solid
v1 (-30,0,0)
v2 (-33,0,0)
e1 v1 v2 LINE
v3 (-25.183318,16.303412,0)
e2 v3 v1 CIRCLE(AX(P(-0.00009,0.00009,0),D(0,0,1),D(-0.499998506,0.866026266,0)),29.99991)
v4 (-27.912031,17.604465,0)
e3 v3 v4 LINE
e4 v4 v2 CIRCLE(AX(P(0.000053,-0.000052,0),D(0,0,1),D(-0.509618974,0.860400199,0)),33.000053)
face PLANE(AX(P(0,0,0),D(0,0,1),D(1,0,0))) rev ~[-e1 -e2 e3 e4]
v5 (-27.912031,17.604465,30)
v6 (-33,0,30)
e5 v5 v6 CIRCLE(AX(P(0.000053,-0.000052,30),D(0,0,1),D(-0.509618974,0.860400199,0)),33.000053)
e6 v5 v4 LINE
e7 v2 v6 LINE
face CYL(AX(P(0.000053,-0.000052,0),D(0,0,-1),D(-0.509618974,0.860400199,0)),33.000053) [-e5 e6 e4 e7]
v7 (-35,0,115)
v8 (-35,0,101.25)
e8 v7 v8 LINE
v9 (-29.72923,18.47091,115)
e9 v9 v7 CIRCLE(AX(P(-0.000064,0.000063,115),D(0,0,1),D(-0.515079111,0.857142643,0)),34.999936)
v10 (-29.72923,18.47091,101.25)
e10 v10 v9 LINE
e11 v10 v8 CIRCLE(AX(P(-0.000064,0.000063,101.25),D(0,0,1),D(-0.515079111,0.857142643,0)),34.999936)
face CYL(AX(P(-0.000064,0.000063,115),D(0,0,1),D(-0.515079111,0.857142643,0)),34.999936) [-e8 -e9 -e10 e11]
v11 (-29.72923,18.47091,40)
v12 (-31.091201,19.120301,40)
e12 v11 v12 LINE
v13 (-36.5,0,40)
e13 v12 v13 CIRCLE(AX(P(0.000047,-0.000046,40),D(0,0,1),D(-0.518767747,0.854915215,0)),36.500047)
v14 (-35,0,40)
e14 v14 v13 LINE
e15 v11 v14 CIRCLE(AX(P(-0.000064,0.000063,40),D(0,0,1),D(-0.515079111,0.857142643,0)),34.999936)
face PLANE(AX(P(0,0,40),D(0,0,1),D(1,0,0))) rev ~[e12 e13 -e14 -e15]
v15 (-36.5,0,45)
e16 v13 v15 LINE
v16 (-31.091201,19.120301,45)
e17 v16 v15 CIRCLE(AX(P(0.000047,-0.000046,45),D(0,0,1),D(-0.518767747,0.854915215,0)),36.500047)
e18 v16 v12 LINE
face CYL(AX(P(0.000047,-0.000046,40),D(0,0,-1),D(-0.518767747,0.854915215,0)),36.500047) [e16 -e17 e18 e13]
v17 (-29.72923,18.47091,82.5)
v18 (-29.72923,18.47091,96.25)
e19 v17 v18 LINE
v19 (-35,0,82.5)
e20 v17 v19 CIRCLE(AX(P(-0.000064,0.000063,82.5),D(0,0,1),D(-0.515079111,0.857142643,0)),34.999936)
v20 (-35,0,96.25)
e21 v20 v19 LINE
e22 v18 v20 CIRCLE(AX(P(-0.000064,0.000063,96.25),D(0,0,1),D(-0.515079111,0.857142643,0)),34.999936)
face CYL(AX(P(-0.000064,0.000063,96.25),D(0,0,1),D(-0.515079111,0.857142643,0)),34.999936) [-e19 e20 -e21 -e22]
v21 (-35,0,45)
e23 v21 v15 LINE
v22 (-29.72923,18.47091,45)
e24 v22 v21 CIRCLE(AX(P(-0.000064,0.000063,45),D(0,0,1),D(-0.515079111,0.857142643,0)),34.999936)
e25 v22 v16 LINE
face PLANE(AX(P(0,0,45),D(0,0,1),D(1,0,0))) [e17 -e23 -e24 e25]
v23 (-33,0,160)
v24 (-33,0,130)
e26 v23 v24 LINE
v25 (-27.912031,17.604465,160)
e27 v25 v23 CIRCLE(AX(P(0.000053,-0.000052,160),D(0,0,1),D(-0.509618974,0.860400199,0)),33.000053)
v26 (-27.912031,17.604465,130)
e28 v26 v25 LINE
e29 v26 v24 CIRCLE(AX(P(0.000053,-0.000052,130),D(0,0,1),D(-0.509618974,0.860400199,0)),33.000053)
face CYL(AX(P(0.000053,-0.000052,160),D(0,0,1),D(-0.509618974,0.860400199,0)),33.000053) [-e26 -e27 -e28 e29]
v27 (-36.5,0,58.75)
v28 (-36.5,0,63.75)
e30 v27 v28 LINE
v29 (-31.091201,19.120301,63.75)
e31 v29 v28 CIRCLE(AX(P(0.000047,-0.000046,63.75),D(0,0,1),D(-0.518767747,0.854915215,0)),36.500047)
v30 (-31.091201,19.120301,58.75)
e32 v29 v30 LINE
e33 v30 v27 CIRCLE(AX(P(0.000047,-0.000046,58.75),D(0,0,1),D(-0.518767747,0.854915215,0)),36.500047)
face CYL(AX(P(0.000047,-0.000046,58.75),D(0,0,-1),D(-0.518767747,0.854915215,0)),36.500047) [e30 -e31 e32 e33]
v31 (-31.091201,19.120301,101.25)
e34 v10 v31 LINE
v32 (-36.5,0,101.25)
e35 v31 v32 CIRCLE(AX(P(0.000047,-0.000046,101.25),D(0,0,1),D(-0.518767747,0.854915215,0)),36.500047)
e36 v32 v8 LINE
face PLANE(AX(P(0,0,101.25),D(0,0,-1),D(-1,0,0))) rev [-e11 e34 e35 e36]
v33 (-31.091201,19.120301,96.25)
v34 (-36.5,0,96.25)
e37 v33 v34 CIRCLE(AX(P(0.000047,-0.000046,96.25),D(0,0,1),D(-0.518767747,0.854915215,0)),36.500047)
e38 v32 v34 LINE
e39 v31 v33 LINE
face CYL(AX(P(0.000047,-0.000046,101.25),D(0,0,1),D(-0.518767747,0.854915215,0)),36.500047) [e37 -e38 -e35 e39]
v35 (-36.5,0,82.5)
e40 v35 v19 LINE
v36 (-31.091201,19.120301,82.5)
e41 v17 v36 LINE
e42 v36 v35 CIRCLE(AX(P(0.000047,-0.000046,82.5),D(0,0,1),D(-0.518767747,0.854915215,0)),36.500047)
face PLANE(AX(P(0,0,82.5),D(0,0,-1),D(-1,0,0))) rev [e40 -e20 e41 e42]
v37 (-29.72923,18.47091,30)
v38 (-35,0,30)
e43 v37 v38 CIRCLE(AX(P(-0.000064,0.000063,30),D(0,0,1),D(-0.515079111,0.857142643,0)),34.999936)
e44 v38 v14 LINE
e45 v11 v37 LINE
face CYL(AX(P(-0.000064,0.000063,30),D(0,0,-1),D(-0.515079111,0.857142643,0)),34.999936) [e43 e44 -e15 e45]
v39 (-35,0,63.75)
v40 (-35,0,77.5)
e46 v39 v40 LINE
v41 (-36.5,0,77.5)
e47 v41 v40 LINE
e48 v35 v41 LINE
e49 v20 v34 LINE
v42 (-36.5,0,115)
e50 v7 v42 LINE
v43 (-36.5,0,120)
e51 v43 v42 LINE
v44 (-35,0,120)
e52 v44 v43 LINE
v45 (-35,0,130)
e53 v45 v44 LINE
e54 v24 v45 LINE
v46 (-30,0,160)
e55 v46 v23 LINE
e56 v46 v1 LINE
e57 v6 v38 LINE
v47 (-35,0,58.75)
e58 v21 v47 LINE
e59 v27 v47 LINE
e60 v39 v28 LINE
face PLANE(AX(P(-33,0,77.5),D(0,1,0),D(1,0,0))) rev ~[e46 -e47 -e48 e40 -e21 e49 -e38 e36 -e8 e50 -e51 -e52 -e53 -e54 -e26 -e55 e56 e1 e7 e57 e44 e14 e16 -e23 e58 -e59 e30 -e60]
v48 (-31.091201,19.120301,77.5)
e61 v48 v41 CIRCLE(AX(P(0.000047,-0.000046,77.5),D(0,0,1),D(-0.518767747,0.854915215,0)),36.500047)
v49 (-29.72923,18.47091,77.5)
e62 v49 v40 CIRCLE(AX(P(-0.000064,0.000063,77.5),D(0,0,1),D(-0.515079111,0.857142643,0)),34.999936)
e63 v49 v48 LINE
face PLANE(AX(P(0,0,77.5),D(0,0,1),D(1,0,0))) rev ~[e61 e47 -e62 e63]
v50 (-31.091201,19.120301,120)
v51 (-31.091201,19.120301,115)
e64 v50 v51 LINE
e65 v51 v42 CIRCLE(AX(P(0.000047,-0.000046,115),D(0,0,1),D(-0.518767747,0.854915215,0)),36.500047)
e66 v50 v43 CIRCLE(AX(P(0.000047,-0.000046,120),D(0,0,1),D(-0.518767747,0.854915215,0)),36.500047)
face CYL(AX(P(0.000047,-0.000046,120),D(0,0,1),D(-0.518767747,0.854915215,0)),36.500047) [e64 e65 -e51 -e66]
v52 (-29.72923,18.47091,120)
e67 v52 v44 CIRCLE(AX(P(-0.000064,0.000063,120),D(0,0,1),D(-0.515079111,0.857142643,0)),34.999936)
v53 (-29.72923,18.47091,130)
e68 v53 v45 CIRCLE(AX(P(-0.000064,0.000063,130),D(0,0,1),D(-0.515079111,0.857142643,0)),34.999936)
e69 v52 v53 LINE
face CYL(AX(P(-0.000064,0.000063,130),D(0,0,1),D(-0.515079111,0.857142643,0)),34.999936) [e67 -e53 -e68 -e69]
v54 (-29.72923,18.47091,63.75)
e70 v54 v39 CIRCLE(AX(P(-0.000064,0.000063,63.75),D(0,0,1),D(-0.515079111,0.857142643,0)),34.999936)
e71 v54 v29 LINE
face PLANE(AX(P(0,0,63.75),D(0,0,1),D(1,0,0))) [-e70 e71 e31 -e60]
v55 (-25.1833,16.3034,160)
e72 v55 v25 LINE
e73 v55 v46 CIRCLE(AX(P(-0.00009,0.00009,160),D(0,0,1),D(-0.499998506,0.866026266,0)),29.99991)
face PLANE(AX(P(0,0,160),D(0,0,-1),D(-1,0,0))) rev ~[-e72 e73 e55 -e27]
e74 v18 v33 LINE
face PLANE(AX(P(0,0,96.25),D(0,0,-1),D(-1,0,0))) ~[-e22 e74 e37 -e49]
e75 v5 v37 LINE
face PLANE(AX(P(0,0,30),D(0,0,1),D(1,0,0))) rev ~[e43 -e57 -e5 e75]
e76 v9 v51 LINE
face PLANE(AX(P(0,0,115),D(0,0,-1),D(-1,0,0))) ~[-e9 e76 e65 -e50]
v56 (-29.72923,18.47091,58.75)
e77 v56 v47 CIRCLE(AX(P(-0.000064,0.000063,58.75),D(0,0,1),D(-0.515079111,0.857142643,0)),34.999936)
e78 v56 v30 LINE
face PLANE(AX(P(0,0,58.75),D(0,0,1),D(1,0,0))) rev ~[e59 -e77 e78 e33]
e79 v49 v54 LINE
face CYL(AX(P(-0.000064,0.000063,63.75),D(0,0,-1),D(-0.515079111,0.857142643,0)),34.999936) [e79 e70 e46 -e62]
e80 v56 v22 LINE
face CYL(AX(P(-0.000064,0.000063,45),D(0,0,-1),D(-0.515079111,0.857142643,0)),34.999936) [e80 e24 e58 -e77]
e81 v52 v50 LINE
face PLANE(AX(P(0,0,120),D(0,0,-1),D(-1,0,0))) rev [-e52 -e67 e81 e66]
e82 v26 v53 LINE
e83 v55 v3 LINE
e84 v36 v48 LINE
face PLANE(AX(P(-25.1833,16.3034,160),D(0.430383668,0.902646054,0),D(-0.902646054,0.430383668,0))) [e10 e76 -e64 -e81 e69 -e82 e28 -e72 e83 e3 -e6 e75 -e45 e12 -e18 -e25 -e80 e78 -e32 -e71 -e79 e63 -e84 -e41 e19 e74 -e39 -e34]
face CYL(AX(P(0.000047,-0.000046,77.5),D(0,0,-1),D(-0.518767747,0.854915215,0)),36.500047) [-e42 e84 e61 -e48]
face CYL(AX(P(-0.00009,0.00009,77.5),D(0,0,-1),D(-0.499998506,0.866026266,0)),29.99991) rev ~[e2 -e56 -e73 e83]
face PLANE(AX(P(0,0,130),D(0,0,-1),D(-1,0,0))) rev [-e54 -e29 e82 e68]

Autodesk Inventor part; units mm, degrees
ref_plane "YZ Plane" through (0, 0, 0) normal (1, 0, 0) x (0, 1, 0)
ref_plane "XZ Plane" through (0, 0, 0) normal (0, 1, 0) x (-1, 0, 0)
ref_plane "XY Plane" through (0, 0, 0) normal (0, 0, 1) x (1, 0, 0)
sketch "Skizze1" plane through (0, 0, 0) normal (0, 0, 1) x (1, 0, 0)
  arc A0 (-15, 25.9808) -> (-30, 0) centre (0, 0) ccw
  line L0 (-15, 25.9808) -> (-16.8174, 28.3932)
  line L1 (-30, 0) -> (-33, 0)
  arc A1 (-16.8174, 28.3932) -> (-33, 0) centre (0, 0) ccw
extrude "Teil B1" add sketch "Skizze1" along normal blind 30
sketch "Skizze2" plane through (0, 0, 30) normal (0, 0, 1) x (1, 0, 0)
  arc A0 (-15, 25.9808) -> (-30, 0) centre (0, 0) ccw projected
  line L0 (-33, 0) -> (-30, 0) projected
  arc A1 (-15, 25.9808) -> (-30, 0) centre (0, 0) ccw
  arc A2 (-18.0278, 30) -> (-35, 0) centre (0, 0) ccw
  line L1 (-30, 0) -> (-35, 0)
  line L2 (-15, 25.9808) -> (-18.0278, 30)
  line L3 (-15, 25.9808) -> (-16.8174, 28.3932) projected
  dimension "d6" = 70
extrude "Teil C1" add sketch "Skizze2" along normal blind 10
sketch "Skizze3" plane through (0, 0, 40) normal (0, 0, 1) x (1, 0, 0)
  arc A0 (-15, 25.9808) -> (-30, 0) centre (0, 0) ccw projected
  line L0 (-33, 0) -> (-30, 0) projected
  arc A1 (-15, 25.9808) -> (-30, 0) centre (0, 0) ccw
  arc A2 (-18.935, 31.2044) -> (-36.5, 0) centre (0, 0) ccw
  line L1 (-30, 0) -> (-36.5, 0)
  line L2 (-15, 25.9808) -> (-16.8174, 28.3932) projected
  line L3 (-15, 25.9808) -> (-18.935, 31.2044)
  dimension "d9" = 73
extrude "Teil D1" add sketch "Skizze3" along normal blind 5
sketch "Skizze4" plane through (0, 0, 45) normal (0, 0, 1) x (1, 0, 0)
  arc A0 (-18.0278, 30) -> (-35, 0) centre (0, 0) ccw
  arc A1 (-15, 25.9808) -> (-30, 0) centre (0, 0) ccw projected
  arc A2 (-15, 25.9808) -> (-30, 0) centre (0, 0) ccw
  line L0 (-16.8174, 28.3932) -> (-18.0278, 30) projected
  line L1 (-15, 25.9808) -> (-18.0278, 30)
  line L2 (-36.5, 0) -> (-35, 0) projected
  line L3 (-30, 0) -> (-35, 0)
extrude "Teil E1" add sketch "Skizze4" along normal blind 13.75
sketch "Skizze5" plane through (0, 0, 58.75) normal (0, 0, 1) x (1, 0, 0)
  arc A0 (-15, 25.9808) -> (-30, 0) centre (0, 0) ccw projected
  arc A1 (-15, 25.9808) -> (-30, 0) centre (0, 0) ccw
  arc A2 (-18.935, 31.2044) -> (-36.5, 0) centre (0, 0) ccw projected
  line L0 (-36.5, 0) -> (-35, 0) projected
  arc A3 (-18.935, 31.2044) -> (-36.5, 0) centre (0, 0) ccw
  line L1 (-33, 0) -> (-30, 0) projected
  line L2 (-36.5, 0) -> (-30, 0)
  line L3 (-15, 25.9808) -> (-18.935, 31.2044)
  point P0 (-15, 25.9808)
extrude "Teil D2" add sketch "Skizze5" along normal blind 5
sketch "Skizze6" plane through (0, 0, 63.75) normal (0, 0, 1) x (1, 0, 0)
  line L0 (-33, 0) -> (-30, 0) projected
  arc A0 (-15, 25.9808) -> (-30, 0) centre (0, 0) ccw
  arc A1 (-18.0278, 30) -> (-35, 0) centre (0, 0) ccw projected
  arc A2 (-18.0278, 30) -> (-35, 0) centre (0, 0) ccw
  line L1 (-36.5, 0) -> (-35, 0) projected
  line L2 (-35, 0) -> (-30, 0)
  line L3 (-15, 25.9808) -> (-18.0278, 30)
  line L4 (-15, 25.9808) -> (-16.8174, 28.3932) projected
extrude "Extrusion6" add sketch "Skizze6" along normal blind 13.75
sketch "Skizze7" plane through (0, 0, 77.5) normal (0, 0, 1) x (1, 0, 0)
  arc A0 (-15, 25.9808) -> (-30, 0) centre (0, 0) ccw projected
  line L0 (-33, 0) -> (-30, 0) projected
  arc A1 (-15, 25.9808) -> (-30, 0) centre (0, 0) ccw
  line L1 (-18.0278, 30) -> (-18.935, 31.2044) projected
  line L2 (-36.5, 0) -> (-35, 0) projected
  arc A2 (-18.935, 31.2044) -> (-36.5, 0) centre (0, 0) ccw
  line L3 (-36.5, 0) -> (-30, 0)
  line L4 (-15, 25.9808) -> (-16.8174, 28.3932) projected
  line L5 (-18.935, 31.2044) -> (-15, 25.9808)
extrude "Extrusion7" add sketch "Skizze7" along normal blind 2.5
mirror "Spiegeln1" about plane through (-25.75, 15.6022, 80) normal (0, 0, 1)
sketch "Skizze8" plane through (-33, 0, 160) normal (0, 0, 1) x (1, 0, 0)
  arc A0 (18, 25.9808) -> (3, 0) centre (33, 0) ccw projected
  line L0 (3, 0) -> (13, 17.3205)
  line L1 (13, 17.3205) -> (4.1881, 22.4081)
  arc A1 (14.065, 31.2044) -> (-3.5, 0) centre (33, 0) ccw projected
  arc A2 (18, 25.9808) -> (9.8826, 19.1203) centre (33, 0) ccw
  arc A3 (14.065, 31.2044) -> (4.1881, 22.4081) centre (33, 0) ccw
  line L2 (14.065, 31.2044) -> (18, 25.9808)
  dimension "d21" = 20
extrude "Extrusion8" cut sketch "Skizze8" against normal through all contours A0 L1 A1 L2
sketch "Skizze9" plane through (-33, 0, 160) normal (0, 0, 1) x (1, 0, 0)
  line L0 (0, 0) -> (3, 0) projected
  arc A0 (9.8826, 19.1203) -> (3, 0) centre (33, 0) ccw projected
  arc A1 (3, 0) -> (7.8167, 16.3034) centre (-4.5602, 11.0968) ccw
  line L1 (7.8167, 16.3034) -> (1.9088, 19.1203)
  arc A2 (4.1881, 22.4081) -> (-3.5, 0) centre (33, 0) ccw projected
  line L2 (4.1881, 22.4081) -> (9.8826, 19.1203)
  arc A3 (4.1881, 22.4081) -> (1.9088, 19.1203) centre (33, 0) ccw
  arc A4 (9.8826, 19.1203) -> (7.8167, 16.3034) centre (33, 0) ccw
  dimension "d24" = 17
extrude "Extrusion9" cut sketch "Skizze9" against normal through all contours A0 L1 A2 L2
properties part number "Bumper_V1"
